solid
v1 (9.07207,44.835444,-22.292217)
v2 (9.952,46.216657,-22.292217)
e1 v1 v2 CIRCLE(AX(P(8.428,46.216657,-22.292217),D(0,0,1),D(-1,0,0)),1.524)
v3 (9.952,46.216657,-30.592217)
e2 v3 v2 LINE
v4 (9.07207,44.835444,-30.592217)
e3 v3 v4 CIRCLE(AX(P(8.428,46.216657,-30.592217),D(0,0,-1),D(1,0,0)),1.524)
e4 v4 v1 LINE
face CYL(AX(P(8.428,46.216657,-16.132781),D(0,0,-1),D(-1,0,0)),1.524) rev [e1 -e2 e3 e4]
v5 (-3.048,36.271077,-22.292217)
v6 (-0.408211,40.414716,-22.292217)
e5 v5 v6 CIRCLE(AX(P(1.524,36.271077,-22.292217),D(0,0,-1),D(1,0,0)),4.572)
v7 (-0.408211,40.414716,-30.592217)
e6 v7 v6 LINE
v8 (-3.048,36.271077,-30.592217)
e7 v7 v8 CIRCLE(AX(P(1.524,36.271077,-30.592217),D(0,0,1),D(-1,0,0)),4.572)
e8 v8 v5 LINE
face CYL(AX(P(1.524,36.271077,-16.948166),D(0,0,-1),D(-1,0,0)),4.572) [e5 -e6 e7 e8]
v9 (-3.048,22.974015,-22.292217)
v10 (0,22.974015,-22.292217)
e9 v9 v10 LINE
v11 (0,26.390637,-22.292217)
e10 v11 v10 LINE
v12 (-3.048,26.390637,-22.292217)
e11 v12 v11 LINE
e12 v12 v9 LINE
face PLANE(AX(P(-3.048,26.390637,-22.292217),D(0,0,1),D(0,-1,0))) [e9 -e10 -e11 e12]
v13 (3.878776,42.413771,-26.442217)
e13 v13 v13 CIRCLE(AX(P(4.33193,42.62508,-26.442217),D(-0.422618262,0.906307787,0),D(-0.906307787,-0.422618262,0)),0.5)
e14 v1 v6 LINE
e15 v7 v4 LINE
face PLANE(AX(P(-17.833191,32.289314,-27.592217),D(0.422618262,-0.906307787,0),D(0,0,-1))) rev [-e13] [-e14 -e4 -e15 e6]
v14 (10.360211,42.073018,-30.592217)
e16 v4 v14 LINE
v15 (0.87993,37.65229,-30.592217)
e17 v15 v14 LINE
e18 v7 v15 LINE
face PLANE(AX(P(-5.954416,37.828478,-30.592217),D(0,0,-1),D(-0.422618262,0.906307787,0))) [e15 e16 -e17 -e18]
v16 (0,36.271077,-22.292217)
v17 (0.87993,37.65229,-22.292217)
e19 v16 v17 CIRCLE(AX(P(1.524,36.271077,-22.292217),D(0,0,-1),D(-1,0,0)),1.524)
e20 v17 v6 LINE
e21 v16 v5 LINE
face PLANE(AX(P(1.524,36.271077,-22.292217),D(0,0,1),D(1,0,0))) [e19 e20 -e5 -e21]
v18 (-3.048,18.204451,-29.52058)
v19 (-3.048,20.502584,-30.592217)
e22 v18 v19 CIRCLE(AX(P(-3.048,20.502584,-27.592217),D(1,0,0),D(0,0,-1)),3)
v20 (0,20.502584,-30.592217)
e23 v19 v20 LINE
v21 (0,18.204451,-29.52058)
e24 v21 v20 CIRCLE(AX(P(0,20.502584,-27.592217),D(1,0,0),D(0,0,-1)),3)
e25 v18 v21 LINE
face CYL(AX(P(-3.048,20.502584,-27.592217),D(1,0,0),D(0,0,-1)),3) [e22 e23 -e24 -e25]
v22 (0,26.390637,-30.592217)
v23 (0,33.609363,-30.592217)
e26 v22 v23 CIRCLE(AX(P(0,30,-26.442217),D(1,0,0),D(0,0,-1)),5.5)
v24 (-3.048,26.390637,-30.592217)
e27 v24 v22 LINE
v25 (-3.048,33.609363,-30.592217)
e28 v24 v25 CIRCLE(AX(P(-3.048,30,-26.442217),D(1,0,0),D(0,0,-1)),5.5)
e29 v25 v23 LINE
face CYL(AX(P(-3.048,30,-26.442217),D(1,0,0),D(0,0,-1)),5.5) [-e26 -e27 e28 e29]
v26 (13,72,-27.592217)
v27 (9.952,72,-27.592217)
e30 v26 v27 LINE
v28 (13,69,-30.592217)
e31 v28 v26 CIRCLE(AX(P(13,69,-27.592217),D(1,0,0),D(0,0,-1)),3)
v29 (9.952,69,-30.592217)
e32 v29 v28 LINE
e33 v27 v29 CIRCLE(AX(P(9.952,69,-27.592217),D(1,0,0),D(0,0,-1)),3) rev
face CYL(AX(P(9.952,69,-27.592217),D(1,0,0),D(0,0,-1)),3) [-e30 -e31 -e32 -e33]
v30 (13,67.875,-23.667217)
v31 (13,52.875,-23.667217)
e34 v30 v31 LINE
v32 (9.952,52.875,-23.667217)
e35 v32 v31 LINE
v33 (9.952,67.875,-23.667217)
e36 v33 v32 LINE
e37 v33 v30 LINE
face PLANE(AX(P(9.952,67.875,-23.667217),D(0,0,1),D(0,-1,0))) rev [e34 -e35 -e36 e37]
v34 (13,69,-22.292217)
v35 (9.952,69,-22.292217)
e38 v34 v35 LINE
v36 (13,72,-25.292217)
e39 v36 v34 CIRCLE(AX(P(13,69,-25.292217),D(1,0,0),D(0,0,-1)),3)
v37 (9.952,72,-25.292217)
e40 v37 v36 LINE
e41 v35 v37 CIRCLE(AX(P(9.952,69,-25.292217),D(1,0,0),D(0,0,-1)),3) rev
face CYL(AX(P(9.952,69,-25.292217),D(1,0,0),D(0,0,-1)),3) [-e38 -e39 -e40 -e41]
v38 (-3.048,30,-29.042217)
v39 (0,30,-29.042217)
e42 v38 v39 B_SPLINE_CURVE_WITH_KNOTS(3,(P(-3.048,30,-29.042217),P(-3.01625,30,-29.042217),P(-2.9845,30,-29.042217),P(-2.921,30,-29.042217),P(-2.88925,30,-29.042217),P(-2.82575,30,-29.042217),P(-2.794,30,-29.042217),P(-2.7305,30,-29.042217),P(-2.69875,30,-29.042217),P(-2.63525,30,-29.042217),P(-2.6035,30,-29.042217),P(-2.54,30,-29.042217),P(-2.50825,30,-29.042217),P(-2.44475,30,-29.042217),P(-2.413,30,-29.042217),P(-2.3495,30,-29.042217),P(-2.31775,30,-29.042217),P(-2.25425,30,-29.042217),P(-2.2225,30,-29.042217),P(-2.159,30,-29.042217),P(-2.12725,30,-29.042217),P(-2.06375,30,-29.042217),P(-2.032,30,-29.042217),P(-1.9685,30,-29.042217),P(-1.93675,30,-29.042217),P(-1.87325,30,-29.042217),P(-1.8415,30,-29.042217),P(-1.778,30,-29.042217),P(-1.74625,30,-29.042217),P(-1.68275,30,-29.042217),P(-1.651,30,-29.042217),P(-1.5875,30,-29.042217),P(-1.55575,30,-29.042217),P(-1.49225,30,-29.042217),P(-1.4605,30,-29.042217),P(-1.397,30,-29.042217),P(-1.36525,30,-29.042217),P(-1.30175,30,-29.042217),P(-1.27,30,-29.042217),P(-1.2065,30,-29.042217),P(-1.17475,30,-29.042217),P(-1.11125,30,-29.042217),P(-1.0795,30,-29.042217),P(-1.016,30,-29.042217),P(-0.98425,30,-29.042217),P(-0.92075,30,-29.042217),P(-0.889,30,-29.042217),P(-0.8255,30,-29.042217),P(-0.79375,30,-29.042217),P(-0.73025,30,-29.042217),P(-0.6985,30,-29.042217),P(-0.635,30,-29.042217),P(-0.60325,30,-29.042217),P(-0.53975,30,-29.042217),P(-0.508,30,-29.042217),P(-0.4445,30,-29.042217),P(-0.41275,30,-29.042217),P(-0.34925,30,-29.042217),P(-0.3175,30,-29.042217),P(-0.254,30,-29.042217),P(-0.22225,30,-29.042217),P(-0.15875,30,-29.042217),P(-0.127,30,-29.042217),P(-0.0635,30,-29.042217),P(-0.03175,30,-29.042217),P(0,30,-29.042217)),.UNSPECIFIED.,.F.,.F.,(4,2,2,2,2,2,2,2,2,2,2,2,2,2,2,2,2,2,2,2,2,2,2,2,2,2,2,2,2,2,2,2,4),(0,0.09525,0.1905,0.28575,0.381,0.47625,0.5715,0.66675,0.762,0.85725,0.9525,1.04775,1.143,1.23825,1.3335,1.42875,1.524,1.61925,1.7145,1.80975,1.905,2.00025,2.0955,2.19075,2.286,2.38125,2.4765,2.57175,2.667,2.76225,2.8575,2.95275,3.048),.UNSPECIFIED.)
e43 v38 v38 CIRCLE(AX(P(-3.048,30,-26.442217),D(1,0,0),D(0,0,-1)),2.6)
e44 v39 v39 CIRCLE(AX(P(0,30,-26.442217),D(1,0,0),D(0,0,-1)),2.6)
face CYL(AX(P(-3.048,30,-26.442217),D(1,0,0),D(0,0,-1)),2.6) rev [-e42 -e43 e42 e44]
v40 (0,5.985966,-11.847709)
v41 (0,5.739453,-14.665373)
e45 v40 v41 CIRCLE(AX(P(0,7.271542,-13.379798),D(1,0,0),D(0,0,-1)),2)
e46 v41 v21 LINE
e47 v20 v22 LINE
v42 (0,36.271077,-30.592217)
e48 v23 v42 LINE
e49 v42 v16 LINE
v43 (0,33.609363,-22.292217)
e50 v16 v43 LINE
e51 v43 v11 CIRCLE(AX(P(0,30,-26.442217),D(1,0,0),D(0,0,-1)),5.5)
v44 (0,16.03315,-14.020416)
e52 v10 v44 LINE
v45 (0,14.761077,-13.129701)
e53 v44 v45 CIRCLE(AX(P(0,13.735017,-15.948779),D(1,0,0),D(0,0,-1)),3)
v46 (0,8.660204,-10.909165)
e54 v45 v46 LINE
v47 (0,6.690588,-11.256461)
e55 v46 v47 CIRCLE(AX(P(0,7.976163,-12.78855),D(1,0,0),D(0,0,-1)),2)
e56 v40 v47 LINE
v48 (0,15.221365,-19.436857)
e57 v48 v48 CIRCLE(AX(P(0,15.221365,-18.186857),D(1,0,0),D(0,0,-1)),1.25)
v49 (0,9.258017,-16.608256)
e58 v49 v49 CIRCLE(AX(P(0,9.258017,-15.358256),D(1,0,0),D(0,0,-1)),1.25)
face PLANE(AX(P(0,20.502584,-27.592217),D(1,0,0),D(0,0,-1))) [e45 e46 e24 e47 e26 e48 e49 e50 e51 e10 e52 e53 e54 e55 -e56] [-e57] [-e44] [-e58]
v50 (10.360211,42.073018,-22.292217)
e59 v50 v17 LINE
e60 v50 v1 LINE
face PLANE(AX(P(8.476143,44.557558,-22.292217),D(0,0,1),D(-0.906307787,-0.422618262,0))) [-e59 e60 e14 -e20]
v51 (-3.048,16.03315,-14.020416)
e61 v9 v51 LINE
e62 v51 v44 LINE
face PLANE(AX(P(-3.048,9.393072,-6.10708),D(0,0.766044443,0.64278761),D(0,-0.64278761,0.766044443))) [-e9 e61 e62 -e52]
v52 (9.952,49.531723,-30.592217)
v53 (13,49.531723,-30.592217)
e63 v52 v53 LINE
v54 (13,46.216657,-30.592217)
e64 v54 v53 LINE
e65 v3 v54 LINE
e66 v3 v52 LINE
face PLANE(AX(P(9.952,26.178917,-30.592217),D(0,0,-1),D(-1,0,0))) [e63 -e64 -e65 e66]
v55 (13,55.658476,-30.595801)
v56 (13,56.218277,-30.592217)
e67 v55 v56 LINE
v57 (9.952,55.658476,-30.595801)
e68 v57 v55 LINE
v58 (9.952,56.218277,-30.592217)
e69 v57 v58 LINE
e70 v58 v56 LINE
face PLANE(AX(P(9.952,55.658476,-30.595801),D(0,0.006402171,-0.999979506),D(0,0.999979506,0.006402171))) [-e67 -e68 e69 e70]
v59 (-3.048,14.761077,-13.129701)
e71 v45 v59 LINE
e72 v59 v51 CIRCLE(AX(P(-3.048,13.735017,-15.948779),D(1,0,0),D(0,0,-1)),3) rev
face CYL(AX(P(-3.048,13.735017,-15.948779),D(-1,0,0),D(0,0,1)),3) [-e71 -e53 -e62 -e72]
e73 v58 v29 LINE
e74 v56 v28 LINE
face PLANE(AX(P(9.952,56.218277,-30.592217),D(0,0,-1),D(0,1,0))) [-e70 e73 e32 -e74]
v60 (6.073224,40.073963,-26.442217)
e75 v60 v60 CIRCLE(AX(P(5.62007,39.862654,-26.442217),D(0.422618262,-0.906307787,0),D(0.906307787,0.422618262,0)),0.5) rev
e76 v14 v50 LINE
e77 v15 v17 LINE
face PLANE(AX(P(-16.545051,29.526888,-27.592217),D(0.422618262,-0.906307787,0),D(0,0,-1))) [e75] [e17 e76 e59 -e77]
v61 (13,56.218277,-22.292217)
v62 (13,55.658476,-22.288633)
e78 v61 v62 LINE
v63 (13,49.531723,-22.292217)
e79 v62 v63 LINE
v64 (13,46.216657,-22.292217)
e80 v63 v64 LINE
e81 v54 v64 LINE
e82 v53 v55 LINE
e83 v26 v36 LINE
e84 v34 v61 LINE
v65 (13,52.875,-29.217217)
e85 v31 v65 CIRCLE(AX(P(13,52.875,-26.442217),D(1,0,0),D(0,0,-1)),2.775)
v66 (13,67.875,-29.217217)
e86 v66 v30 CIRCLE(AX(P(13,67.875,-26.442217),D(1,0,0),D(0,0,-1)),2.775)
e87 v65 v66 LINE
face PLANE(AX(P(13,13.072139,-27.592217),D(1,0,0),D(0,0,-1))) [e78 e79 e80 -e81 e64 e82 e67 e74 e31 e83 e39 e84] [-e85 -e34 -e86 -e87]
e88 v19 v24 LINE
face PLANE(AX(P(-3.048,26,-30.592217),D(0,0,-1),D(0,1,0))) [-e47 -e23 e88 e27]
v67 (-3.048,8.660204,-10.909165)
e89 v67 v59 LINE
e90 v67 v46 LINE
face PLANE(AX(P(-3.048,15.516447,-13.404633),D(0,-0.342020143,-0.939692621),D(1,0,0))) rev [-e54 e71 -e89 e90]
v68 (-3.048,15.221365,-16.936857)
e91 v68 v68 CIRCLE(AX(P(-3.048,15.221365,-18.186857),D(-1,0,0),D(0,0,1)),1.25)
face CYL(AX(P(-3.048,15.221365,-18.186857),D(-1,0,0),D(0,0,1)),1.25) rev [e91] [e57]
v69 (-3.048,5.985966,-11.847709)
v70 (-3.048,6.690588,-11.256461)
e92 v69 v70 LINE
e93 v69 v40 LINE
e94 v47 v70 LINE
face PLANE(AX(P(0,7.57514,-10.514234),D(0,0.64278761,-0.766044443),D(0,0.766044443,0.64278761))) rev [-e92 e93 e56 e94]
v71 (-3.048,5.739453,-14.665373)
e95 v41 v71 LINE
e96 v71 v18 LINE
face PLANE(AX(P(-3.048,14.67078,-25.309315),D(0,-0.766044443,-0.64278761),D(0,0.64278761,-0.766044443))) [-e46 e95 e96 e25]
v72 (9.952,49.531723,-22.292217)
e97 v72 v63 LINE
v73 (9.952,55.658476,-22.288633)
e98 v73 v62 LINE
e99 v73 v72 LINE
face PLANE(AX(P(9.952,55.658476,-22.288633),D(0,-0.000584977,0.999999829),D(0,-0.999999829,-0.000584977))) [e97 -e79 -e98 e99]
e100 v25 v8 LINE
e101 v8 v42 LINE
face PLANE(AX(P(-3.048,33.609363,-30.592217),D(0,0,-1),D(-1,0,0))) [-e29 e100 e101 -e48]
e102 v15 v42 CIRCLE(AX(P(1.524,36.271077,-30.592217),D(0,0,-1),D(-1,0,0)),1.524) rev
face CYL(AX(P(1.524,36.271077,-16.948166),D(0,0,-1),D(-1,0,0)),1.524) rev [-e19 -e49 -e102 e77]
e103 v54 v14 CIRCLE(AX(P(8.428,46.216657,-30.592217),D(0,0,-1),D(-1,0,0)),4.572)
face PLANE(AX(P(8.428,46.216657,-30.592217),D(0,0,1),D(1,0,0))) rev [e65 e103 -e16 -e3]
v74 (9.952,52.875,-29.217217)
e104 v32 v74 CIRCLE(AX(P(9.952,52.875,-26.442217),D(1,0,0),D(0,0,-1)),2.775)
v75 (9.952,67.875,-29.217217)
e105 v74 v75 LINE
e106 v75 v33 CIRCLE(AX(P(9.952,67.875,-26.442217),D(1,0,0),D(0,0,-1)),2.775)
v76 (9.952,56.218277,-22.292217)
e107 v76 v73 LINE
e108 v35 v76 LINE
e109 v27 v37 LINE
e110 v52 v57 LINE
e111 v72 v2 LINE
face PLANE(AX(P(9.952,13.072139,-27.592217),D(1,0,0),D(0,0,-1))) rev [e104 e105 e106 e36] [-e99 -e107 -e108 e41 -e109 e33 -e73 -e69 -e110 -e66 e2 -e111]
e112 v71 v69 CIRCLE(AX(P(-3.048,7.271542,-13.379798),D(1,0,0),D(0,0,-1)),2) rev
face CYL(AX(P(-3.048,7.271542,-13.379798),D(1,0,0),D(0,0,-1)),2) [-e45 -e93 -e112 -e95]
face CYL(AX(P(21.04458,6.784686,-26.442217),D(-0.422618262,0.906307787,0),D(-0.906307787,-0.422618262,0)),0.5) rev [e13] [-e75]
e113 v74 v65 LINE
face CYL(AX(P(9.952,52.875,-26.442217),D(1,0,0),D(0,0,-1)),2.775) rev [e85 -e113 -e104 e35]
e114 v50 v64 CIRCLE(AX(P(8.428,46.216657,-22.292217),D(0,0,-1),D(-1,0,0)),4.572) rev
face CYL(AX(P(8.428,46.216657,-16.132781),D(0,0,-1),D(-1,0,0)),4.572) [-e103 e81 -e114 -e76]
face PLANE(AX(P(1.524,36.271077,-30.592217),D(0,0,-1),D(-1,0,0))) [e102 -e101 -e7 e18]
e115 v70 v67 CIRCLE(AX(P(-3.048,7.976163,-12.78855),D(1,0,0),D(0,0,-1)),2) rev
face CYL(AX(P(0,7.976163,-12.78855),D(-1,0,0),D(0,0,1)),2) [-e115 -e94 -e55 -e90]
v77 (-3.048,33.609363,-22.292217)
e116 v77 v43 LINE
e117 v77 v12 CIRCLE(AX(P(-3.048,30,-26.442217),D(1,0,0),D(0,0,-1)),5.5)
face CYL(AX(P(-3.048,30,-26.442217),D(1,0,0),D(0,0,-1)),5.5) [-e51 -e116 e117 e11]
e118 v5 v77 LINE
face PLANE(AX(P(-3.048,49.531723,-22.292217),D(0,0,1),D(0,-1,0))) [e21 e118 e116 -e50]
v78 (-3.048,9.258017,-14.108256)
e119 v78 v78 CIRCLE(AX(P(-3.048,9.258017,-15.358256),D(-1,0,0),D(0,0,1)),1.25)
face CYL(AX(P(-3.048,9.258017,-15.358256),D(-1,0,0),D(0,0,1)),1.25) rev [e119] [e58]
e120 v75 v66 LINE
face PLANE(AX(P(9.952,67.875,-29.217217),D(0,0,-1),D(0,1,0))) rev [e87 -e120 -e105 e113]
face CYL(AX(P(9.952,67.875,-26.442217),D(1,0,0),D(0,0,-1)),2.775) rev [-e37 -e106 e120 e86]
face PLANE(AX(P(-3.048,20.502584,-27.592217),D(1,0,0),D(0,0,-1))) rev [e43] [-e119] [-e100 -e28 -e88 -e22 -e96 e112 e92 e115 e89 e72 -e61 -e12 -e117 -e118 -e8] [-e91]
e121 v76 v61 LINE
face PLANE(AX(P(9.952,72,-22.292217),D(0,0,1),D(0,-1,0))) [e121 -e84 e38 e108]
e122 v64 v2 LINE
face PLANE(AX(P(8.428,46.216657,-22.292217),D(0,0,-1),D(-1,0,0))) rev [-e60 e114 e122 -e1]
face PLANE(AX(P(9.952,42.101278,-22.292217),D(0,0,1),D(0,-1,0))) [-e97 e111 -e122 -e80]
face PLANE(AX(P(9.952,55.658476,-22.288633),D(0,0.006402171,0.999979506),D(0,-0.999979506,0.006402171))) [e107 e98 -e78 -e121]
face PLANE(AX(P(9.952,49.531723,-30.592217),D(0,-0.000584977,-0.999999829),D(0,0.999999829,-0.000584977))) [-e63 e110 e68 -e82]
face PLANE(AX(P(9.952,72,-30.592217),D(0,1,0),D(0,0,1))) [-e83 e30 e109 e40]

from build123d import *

# Parameters (mm, degrees)
BASE_FLANGE1_START      = -3.048
BASE_FLANGE1_OUTLINE_R  = 2.6
BASE_FLANGE1_DEPTH      = 3.048
CHAMFER1_SIZE           = 5.5
CHAMFER1_SIZE2          = 9.526279442
FILLET5_R               = 3
JOG1_START              = -31.942217141
JOG1_DEPTH              = 22.299805307
JOG1_START_2            = -30.592217141
JOG1_2_DEPTH            = 1.375
JOG1_START_3            = -23.667217141
JOG1_3_DEPTH            = 1.375
JOG1_START_4            = -30.595801154
JOG1_4_DEPTH            = 8.307168025
JOG1_5_DEPTH            = 13
EDGE_FLANGE1_DEPTH      = 15
FILLET4_R               = 3
CUT_EXTRUDE4_DEPTH      = 85.269968197
CUT_EXTRUDE4_DEPTH_BACK = 85.269968197
M3X0_5_TAPPED_HOLE2_D   = 2.5
CUT_EXTRUDE5_REACH      = 59.699
SKETCH19_R              = 0.5
CUT_EXTRUDE6_DEPTH      = 80.832983383
FILLET9_R               = 2


with BuildPart() as part:
    # Base-Flange1: read off the stored shape, not the designer's step
    # Base-Flange1 outline → Base-Flange1 (new body)
    with BuildSketch(Plane(origin=(0, 0, 0), x_dir=(0, 0, -1), z_dir=(1, 0, 0)).offset(BASE_FLANGE1_START)):
        with BuildLine():
            Line((11.442217141, 3.034903463), (29.520579971, 18.204451045))
            ThreePointArc((29.520579971, 18.204451045), (30.311140503, 19.234729589), (30.592217141, 20.502584374))
            Line((30.592217141, 20.502584374), (30.592217141, 26.390637175))
            ThreePointArc((30.592217141, 26.390637175), (31.942217141, 30), (30.592217141, 33.609362825))
            Line((30.592217141, 33.609362825), (30.592217141, 49.531723164))
            Line((30.592217141, 49.531723164), (30.595801154, 55.658476217))
            Line((30.595801154, 55.658476217), (30.592217141, 56.218276836))
            Line((30.592217141, 56.218276836), (30.592217141, 72))
            Line((30.592217141, 72), (22.292217141, 72))
            Line((22.292217141, 72), (22.292217141, 56.218276836))
            Line((22.292217141, 56.218276836), (22.288633129, 55.658476217))
            Line((22.288633129, 55.658476217), (22.292217141, 49.531723164))
            Line((22.292217141, 49.531723164), (22.292217141, 33.609362825))
            ThreePointArc((22.292217141, 33.609362825), (20.942217141, 30), (22.292217141, 26.390637175))
            Line((22.292217141, 26.390637175), (22.292217141, 22.974014962))
            Line((22.292217141, 22.974014962), (6.107079981, 9.393072341))
            Line((6.107079981, 9.393072341), (11.442217141, 3.034903463))
        make_face()
        with Locations((26.442217141, 30)):
            Circle(BASE_FLANGE1_OUTLINE_R, mode=Mode.SUBTRACT)
        with BuildLine():
            ThreePointArc((23.667217141, 67.875), (26.442217141, 70.65), (29.217217141, 67.875))
            Line((29.217217141, 67.875), (29.217217141, 52.875))
            ThreePointArc((29.217217141, 52.875), (26.442217141, 50.1), (23.667217141, 52.875))
            Line((23.667217141, 52.875), (23.667217141, 67.875))
        make_face(mode=Mode.SUBTRACT)
    extrude(amount=BASE_FLANGE1_DEPTH)

    # Chamfer1
    chamfer1_edges = [part.edges().sort_by_distance(p)[0] for p in [
        (-1.524, 9.393072341, -6.107079981),
    ]]
    chamfer1_side = [part.faces().sort_by_distance(p)[0] for p in [
        (-1.524, 6.213987902, -8.774648561),
    ]]
    chamfer(chamfer1_edges, length=CHAMFER1_SIZE, length2=CHAMFER1_SIZE2, reference=chamfer1_side[0])

    # Fillet5
    fillet5_edges = [part.edges().sort_by_distance(p)[0] for p in [
        (-1.524, 15.516446733, -13.404633411),
    ]]
    fillet(fillet5_edges, radius=FILLET5_R)

    # Jog1: read off the stored shape, not the designer's step
    # Jog1 outline → Jog1 (cut)
    with BuildSketch(Plane.XY.offset(JOG1_START)):
        with BuildLine():
            Line((-0.408210693, 40.414716045), (0, 40.605067817))
            Line((0, 40.605067817), (0, 72))
            Line((0, 72), (-3.048, 72))
            Line((-3.048, 72), (-3.048, 36.271076843))
            ThreePointArc((-3.048, 36.271076843), (-2.33198569, 38.727610652), (-0.408210693, 40.414716045))
        make_face()
    extrude(amount=JOG1_DEPTH, mode=Mode.SUBTRACT)

    # Jog1 2 outline → Jog1 2 (add)
    with BuildSketch(Plane.XY.offset(JOG1_START_2)):
        with BuildLine():
            ThreePointArc((0, 36.271076843), (0.238671437, 37.089921446), (0.879929769, 37.65228991))
            Line((0.879929769, 37.65228991), (10.360210693, 42.073017507))
            ThreePointArc((10.360210693, 42.073017507), (12.28398569, 43.7601229), (13, 46.216656709))
            Line((13, 46.216656709), (13, 72))
            Line((13, 72), (9.952, 72))
            Line((9.952, 72), (9.952, 46.216656709))
            ThreePointArc((9.952, 46.216656709), (9.713328563, 45.397812106), (9.072070231, 44.835443641))
            Line((9.072070231, 44.835443641), (0, 40.605067817))
            Line((0, 40.605067817), (0, 36.271076843))
        make_face()
    extrude(amount=JOG1_2_DEPTH)

    # Jog1 3 outline → Jog1 3 (add)
    with BuildSketch(Plane.XY.offset(JOG1_START_3)):
        with BuildLine():
            ThreePointArc((0, 36.271076843), (0.238671437, 37.089921446), (0.879929769, 37.65228991))
            Line((0.879929769, 37.65228991), (10.360210693, 42.073017507))
            ThreePointArc((10.360210693, 42.073017507), (12.28398569, 43.7601229), (13, 46.216656709))
            Line((13, 46.216656709), (13, 72))
            Line((13, 72), (9.952, 72))
            Line((9.952, 72), (9.952, 46.216656709))
            ThreePointArc((9.952, 46.216656709), (9.713328563, 45.397812106), (9.072070231, 44.835443641))
            Line((9.072070231, 44.835443641), (0, 40.605067817))
            Line((0, 40.605067817), (0, 36.271076843))
        make_face()
    extrude(amount=JOG1_3_DEPTH)

    # Jog1 4 outline → Jog1 4 (add)
    with BuildSketch(Plane.XY.offset(JOG1_START_4)):
        with BuildLine():
            ThreePointArc((0, 36.271076843), (0.238671437, 37.089921446), (0.879929769, 37.65228991))
            Line((0.879929769, 37.65228991), (10.360210693, 42.073017507))
            ThreePointArc((10.360210693, 42.073017507), (12.28398569, 43.7601229), (13, 46.216656709))
            Line((13, 46.216656709), (13, 72))
            Line((13, 72), (9.952, 72))
            Line((9.952, 72), (9.952, 46.216656709))
            ThreePointArc((9.952, 46.216656709), (9.713328563, 45.397812106), (9.072070231, 44.835443641))
            Line((9.072070231, 44.835443641), (0, 40.605067817))
            Line((0, 40.605067817), (0, 36.271076843))
        make_face()
    extrude(amount=JOG1_4_DEPTH)

    # Jog1 5 outline → Jog1 5 (cut)
    with BuildSketch(Plane.YZ):
        Polygon((49.531723164, -30.592217141), (35, -30.592217141), (35, -30.595801154), (55.658476217, -30.595801154), align=None)
        Polygon((35, -22.288633129), (35, -22.292217141), (49.531723164, -22.292217141), (55.658476217, -22.288633129), align=None)
        Polygon((56.218276836, -30.592217141), (55.658476217, -30.595801154), (73, -30.595801154), (73, -30.592217141), align=None)
        Polygon((73, -22.288633129), (55.658476217, -22.288633129), (56.218276836, -22.292217141), (73, -22.292217141), align=None)
        with BuildLine():
            Line((67.875, -23.667217141), (52.875, -23.667217141))
            ThreePointArc((52.875, -23.667217141), (50.1, -26.442217141), (52.875, -29.217217141))
            Line((52.875, -29.217217141), (67.875, -29.217217141))
            ThreePointArc((67.875, -29.217217141), (70.65, -26.442217141), (67.875, -23.667217141))
        make_face()
    extrude(amount=JOG1_5_DEPTH, mode=Mode.SUBTRACT)

    # Edge-Flange1: sheet metal written as solids
    # Edge-Flange1 section (on a plane across the edge) → Edge-Flange1 (add)
    with BuildSketch(Plane(origin=(0, 1.867451731, -12.421825459), x_dir=(3.4914813388431326e-15, 0.7660444431189821, 0.6427876096865346), z_dir=(0, 0.6427876096865346, -0.7660444431189821))):
        with BuildLine():
            Line((-3.048, 1.524), (-3.048, 29.952))
            Line((-3.048, 29.952), (0, 29.952))
            Line((0, 29.952), (0, 1.524))
            ThreePointArc((0, 1.524), (0.446369265, 0.446369265), (1.524, 0))
            Line((1.524, 0), (1.524, -3.048))
            ThreePointArc((1.524, -3.048), (-1.708892204, -1.708892204), (-3.048, 1.524))
        make_face()
    extrude(amount=EDGE_FLANGE1_DEPTH)

    # Fillet4
    fillet4_edges = [part.edges().sort_by_distance(p)[0] for p in [
        (11.476, 72, -30.592217141),
        (11.476, 72, -22.292217141),
    ]]
    fillet(fillet4_edges, radius=FILLET4_R)

    # Sketch17 → Cut-Extrude4 (cut, two sides: drawn at the far end of the back side and taken through both)
    with BuildSketch(Plane(origin=(0, 0, 0), x_dir=(0, 0, -1), z_dir=(1, 0, 0)).offset(-CUT_EXTRUDE4_DEPTH_BACK)):
        Polygon((22.932883788, 12.676717608), (2.605814743, -4.379718531), (8.769545562, -11.725366877), (29.096614607, 5.331069261), align=None)
    extrude(amount=CUT_EXTRUDE4_DEPTH + CUT_EXTRUDE4_DEPTH_BACK, mode=Mode.SUBTRACT)

    # M3x0.5 Tapped Hole2 (through all)
    with Locations(Plane(origin=(-3.048, 15.221364604, -18.186856854), x_dir=(0, 0, -1), z_dir=(-1, 0, 0))):
        with Locations((0, 0), (-2.828600732, 5.963347877)):
            Hole(M3X0_5_TAPPED_HOLE2_D / 2)

    # Sketch19 → Cut-Extrude5 (cut, up to next)
    with BuildSketch(Plane(origin=(-15.552643282, 33.35275115, 0), x_dir=(0.906307787036651, 0.4226182617406973, 0), z_dir=(-0.4226182617406973, 0.906307787036651, 0)), mode=Mode.PRIVATE) as cut_extrude5_sk1:
        with Locations(Location((21.940198833, 26.442217141, 0), (0, 0, 180))):
            Circle(SKETCH19_R)
    cut_extrude5_tool1 = extrude(cut_extrude5_sk1.sketch, amount=-CUT_EXTRUDE5_REACH, mode=Mode.PRIVATE) & part.part
    add(cut_extrude5_tool1.solids().sort_by_distance((4.33193, 42.62508, -26.442217))[0], mode=Mode.SUBTRACT)

    # Sketch21 → Cut-Extrude6 (cut, through all)
    with BuildSketch(Plane(origin=(0, 0, 0), x_dir=(0, 0, -1), z_dir=(1, 0, 0))):
        Polygon((10.514234213, 7.575140201), (9.642411834, 5.179827903), (11.442217141, 3.034903463), (13.133284575, 4.453877523), align=None)
    extrude(amount=-CUT_EXTRUDE6_DEPTH, mode=Mode.SUBTRACT)

    # Fillet9
    fillet9_edges = [part.edges().sort_by_distance(p)[0] for p in [
        (-1.524, 7.575140201, -10.514234213),
        (-1.524, 4.453877523, -13.133284575),
    ]]
    fillet(fillet9_edges, radius=FILLET9_R)


solid = part.part
